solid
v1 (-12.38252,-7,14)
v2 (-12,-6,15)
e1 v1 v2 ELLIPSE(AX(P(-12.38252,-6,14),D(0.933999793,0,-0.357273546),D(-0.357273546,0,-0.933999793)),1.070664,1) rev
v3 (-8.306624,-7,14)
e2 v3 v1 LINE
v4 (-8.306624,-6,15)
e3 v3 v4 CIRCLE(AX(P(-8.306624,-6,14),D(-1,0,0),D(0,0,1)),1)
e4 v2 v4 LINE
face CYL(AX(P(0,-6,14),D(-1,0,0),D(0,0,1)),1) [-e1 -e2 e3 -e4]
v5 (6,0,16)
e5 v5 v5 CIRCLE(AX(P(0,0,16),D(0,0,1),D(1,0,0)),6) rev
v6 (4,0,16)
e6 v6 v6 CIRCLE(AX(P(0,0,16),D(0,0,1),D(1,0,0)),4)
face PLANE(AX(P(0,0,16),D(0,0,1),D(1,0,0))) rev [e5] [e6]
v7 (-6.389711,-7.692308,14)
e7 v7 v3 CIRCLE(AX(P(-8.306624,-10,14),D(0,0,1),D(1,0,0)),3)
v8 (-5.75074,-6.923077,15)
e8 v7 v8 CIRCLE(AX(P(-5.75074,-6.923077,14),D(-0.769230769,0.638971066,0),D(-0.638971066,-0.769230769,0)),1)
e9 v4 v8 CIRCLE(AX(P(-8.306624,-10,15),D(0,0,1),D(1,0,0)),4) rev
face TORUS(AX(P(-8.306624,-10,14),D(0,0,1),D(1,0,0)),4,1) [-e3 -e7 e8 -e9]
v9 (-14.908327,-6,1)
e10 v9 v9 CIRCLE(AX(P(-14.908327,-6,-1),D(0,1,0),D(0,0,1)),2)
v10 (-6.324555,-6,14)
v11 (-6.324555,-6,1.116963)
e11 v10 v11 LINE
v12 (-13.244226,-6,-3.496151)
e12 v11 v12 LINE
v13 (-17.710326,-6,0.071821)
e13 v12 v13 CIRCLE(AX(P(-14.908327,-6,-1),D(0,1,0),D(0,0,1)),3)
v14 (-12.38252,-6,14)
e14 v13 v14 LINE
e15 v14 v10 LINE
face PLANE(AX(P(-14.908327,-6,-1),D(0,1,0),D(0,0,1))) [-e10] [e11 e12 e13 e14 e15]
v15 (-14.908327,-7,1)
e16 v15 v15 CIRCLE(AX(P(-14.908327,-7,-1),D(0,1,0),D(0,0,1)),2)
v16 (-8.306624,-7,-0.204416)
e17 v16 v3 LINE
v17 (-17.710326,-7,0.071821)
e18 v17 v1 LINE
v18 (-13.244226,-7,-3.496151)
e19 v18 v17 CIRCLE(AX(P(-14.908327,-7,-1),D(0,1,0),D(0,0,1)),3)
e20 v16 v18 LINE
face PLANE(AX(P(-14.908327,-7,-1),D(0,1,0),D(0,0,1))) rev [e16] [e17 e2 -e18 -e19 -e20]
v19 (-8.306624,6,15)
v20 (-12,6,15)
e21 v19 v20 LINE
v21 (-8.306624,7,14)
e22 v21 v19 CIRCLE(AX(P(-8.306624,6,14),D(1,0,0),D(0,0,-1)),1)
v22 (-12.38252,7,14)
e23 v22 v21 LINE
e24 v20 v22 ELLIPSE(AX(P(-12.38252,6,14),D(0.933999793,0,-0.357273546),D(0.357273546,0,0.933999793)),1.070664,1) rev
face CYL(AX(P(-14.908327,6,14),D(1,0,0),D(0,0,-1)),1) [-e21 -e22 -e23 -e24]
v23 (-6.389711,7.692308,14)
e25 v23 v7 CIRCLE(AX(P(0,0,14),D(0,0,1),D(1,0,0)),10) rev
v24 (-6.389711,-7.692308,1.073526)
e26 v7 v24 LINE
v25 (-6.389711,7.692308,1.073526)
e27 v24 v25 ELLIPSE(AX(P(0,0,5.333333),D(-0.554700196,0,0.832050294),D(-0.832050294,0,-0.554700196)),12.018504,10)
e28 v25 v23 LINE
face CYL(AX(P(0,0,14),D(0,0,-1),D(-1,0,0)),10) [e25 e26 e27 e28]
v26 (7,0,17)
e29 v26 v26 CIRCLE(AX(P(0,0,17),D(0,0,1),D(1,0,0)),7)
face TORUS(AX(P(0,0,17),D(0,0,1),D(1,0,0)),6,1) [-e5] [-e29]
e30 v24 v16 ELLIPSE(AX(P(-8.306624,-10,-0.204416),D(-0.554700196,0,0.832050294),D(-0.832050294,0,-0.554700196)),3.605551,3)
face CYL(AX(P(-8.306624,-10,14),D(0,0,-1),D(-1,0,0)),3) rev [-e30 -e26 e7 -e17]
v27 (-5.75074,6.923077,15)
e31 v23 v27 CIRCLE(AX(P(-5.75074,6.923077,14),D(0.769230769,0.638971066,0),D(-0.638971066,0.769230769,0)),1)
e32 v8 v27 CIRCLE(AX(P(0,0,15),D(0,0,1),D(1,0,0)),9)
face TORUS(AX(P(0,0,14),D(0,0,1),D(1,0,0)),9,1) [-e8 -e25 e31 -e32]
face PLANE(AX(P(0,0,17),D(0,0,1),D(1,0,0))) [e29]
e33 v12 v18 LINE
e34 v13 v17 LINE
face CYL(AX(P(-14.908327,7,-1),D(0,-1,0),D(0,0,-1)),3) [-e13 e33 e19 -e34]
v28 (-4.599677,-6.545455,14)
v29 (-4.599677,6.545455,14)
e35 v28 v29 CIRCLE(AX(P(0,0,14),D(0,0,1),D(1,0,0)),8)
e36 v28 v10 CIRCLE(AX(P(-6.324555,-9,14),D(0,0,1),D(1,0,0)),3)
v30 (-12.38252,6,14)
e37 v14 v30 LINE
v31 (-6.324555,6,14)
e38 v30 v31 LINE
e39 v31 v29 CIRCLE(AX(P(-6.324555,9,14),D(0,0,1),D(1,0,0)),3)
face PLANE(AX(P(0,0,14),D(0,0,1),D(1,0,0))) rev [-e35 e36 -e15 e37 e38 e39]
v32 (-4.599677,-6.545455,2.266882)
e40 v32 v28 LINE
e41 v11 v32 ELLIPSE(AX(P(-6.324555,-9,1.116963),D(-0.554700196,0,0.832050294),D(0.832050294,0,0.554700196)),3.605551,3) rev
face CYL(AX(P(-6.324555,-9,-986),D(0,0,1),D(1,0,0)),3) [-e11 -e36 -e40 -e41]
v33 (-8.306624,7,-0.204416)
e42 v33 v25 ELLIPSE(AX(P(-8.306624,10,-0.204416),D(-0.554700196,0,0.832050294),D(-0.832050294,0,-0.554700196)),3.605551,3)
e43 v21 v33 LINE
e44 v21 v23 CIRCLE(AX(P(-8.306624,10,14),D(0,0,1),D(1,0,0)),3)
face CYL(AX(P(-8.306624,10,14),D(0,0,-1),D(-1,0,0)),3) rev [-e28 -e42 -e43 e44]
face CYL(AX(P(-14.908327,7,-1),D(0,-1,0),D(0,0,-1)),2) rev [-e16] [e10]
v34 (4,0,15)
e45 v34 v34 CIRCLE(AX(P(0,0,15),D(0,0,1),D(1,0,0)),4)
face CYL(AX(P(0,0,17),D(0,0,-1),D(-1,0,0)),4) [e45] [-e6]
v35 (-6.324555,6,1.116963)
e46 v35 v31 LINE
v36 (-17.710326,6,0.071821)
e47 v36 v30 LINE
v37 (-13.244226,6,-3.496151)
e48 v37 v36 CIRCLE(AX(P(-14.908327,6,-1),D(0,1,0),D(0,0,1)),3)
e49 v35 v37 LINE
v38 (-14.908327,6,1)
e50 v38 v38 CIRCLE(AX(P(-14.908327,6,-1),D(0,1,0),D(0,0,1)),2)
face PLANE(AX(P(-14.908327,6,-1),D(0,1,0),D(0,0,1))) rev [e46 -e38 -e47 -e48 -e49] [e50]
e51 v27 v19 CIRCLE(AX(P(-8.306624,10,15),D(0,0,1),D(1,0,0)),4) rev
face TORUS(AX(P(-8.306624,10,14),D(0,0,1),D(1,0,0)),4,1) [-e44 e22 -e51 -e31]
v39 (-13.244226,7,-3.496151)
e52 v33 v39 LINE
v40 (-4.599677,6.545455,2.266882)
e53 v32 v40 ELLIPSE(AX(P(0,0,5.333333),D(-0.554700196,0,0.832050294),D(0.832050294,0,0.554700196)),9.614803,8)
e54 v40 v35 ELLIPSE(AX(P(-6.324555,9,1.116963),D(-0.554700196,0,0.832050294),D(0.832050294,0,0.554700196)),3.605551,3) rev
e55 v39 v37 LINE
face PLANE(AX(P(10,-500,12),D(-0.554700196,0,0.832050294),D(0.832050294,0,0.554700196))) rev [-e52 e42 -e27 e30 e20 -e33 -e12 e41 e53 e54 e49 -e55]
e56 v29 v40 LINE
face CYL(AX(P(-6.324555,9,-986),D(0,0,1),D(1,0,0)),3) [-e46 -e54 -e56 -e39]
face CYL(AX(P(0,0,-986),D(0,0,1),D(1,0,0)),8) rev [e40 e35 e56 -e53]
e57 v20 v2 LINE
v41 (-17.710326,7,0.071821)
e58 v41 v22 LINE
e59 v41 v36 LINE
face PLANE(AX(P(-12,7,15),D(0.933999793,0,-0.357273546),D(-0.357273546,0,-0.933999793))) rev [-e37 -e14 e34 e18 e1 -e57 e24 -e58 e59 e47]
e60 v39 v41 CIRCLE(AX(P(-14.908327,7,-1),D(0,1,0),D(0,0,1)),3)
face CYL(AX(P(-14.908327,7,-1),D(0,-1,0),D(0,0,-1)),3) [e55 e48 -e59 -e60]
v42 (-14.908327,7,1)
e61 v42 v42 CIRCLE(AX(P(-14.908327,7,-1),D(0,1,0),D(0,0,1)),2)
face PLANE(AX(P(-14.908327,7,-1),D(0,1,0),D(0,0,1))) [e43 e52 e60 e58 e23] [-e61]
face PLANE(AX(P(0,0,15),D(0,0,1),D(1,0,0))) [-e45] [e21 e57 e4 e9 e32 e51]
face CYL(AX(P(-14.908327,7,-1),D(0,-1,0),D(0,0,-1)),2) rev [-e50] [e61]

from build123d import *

# Parameters (mm, degrees)
SKETCH_1_R          = 10
EXTRUDE_1_DEPTH     = 14
CUT_EXTRUDE_1_DEPTH = 500
SKETCH_4_R          = 8
CUT_EXTRUDE_2_DEPTH = 1000
SKETCH_6_R          = 10
EXTRUDE_2_DEPTH     = 1
SKETCH_5_R          = 2.000000000000003
EXTRUDE_3_DEPTH     = 7
SKETCH_5_2_R        = 2.000000000000003
CUT_EXTRUDE_3_DEPTH = 6
SKETCH_7_W          = 0.9999999999999662
SKETCH_7_H          = 12
EXTRUDE_4_DEPTH     = 5
EXTRUDE_5_DEPTH     = 12
SKETCH_9_W          = 12.6666666666667
SKETCH_9_H          = 12
CUT_EXTRUDE_4_DEPTH = 5
SKETCH_10_R         = 4
EXTRUDE_6_DEPTH     = 2
SKETCH_11_R         = 7
EXTRUDE_7_DEPTH     = 1
FILLET_1_R          = 3
FILLET_2_R          = 1
FILLET_4_R          = 1


with BuildPart() as part:
    # 草图1 → 凸台-拉伸1 (new body)
    with BuildSketch(Plane.XY):
        Circle(SKETCH_1_R)
    extrude(amount=EXTRUDE_1_DEPTH)

    # 草图3 → 切除-拉伸1 (cut, symmetric)
    with BuildSketch(Plane(origin=(0, 0, 0), x_dir=(1, 0, 0), z_dir=(0, 1, 0))):
        Polygon((-7.999999999999998, 0), (10, 0), (10, -12), align=None)
    extrude(amount=CUT_EXTRUDE_1_DEPTH, both=True, mode=Mode.SUBTRACT)

    # 草图4 → 切除-拉伸2 (cut)
    with BuildSketch(Plane.XY.offset(14)):
        Circle(SKETCH_4_R)
    extrude(amount=-CUT_EXTRUDE_2_DEPTH, mode=Mode.SUBTRACT)

    # 草图6 → 凸台-拉伸2 (add)
    with BuildSketch(Plane.XY.offset(14)):
        Circle(SKETCH_6_R)
    extrude(amount=EXTRUDE_2_DEPTH)

    # 草图5 → 凸台-拉伸3 (add, symmetric)
    with BuildSketch(Plane(origin=(0, 0, 0), x_dir=(1, 0, 0), z_dir=(0, 1, 0))):
        with BuildLine():
            Line((-5.9999999999999964, -14.999999999999968), (-11.999999999999996, -14.999999999999968))
            Line((-11.999999999999996, -14.999999999999968), (-17.71032629227648, -0.0718206378086078))
            ThreePointArc((-17.71032629227648, -0.0718206378086078), (-16.78084089382489, 3.3438624943348247), (-13.244226324520296, 3.496150883013566))
            Line((-13.244226324520296, 3.496150883013566), (-5.999999999999997, -1.333333333333298))
            Line((-5.999999999999997, -1.333333333333298), (-5.9999999999999964, -14.999999999999968))
        make_face()
        with Locations(Location((-14.908326913195987, 1.0000000000000329, 0), (0, 0, 270))):
            Circle(SKETCH_5_R, mode=Mode.SUBTRACT)
    extrude(amount=EXTRUDE_3_DEPTH, both=True)

    # 草图5<2> → 切除-拉伸3 (cut, symmetric)
    with BuildSketch(Plane(origin=(0, 0, 0), x_dir=(1, 0, 0), z_dir=(0, 1, 0))):
        with BuildLine():
            Line((-5.9999999999999964, -14.999999999999968), (-11.999999999999996, -14.999999999999968))
            Line((-11.999999999999996, -14.999999999999968), (-17.71032629227648, -0.0718206378086078))
            ThreePointArc((-17.71032629227648, -0.0718206378086078), (-16.78084089382489, 3.3438624943348247), (-13.244226324520296, 3.496150883013566))
            Line((-13.244226324520296, 3.496150883013566), (-5.999999999999997, -1.333333333333298))
            Line((-5.999999999999997, -1.333333333333298), (-5.9999999999999964, -14.999999999999968))
        make_face()
        with Locations(Location((-14.908326913195987, 1.0000000000000329, 0), (0, 0, 270))):
            Circle(SKETCH_5_2_R, mode=Mode.SUBTRACT)
    extrude(amount=CUT_EXTRUDE_3_DEPTH, both=True, mode=Mode.SUBTRACT)

    # 草图7 → 凸台-拉伸4 (add)
    with BuildSketch(Plane.ZY.offset(5.999999999999997)):
        with Locations((14.499999999999986, 0)):
            Rectangle(SKETCH_7_W, SKETCH_7_H)
    extrude(amount=EXTRUDE_4_DEPTH)

    # 草图8 → 凸台-拉伸5 (add)
    with BuildSketch(Plane.XZ.offset(-6)):
        Polygon((-11.999999999999996, 14.999999999999968), (-12.382519941228653, 14), (-10.999999999999996, 14), (-10.999999999999996, 14.999999999999968), align=None)
    extrude(amount=EXTRUDE_5_DEPTH)

    # 草图9 → 切除-拉伸4 (cut)
    with BuildSketch(Plane.ZY.offset(5.999999999999997)):
        with Locations((7.6666666666666465, 0)):
            Rectangle(SKETCH_9_W, SKETCH_9_H)
    extrude(amount=-CUT_EXTRUDE_4_DEPTH, mode=Mode.SUBTRACT)

    # 草图10 → 凸台-拉伸6 (add)
    with BuildSketch(Plane.XY.offset(15)):
        Circle(SKETCH_10_R)
    extrude(amount=EXTRUDE_6_DEPTH)

    # 草图11 → 凸台-拉伸7 (add)
    with BuildSketch(Plane.XY.offset(17)):
        Circle(SKETCH_11_R)
    extrude(amount=-EXTRUDE_7_DEPTH)

    # 圆角1
    fillet_1_edges = [part.edges().sort_by_distance(p)[0] for p in [
        (-5.291502622129181, -6, 7.902832459290273),
        (-5.291502622129181, 6, 7.902832459290272),
        (-7.14142842854285, -7, 7.7861905238190845),
        (-7.14142842854285, 7, 7.786190523819085),
    ]]
    fillet(fillet_1_edges, radius=FILLET_1_R)

    # 圆角2
    fillet_2_edges = [part.edges().sort_by_distance(p)[0] for p in [
        (-7, 8.6e-16, 16),
    ]]
    fillet(fillet_2_edges, radius=FILLET_2_R - 0.0001)  # a hair under: the kernel refuses the full size

    # 圆角4
    fillet_4_edges = [part.edges().sort_by_distance(p)[0] for p in [
        (10, -1.78e-15, 15),
        (-7.287574532187941, -7.178380170622118, 14.999999999999968),
        (-7.287574532187943, 7.178380170622118, 14.999999999999968),
        (-10.153311931459037, 7, 14.999999999999968),
        (-10.153311931459037, -7, 14.999999999999968),
    ]]
    fillet(fillet_4_edges, radius=FILLET_4_R)


solid = part.part
